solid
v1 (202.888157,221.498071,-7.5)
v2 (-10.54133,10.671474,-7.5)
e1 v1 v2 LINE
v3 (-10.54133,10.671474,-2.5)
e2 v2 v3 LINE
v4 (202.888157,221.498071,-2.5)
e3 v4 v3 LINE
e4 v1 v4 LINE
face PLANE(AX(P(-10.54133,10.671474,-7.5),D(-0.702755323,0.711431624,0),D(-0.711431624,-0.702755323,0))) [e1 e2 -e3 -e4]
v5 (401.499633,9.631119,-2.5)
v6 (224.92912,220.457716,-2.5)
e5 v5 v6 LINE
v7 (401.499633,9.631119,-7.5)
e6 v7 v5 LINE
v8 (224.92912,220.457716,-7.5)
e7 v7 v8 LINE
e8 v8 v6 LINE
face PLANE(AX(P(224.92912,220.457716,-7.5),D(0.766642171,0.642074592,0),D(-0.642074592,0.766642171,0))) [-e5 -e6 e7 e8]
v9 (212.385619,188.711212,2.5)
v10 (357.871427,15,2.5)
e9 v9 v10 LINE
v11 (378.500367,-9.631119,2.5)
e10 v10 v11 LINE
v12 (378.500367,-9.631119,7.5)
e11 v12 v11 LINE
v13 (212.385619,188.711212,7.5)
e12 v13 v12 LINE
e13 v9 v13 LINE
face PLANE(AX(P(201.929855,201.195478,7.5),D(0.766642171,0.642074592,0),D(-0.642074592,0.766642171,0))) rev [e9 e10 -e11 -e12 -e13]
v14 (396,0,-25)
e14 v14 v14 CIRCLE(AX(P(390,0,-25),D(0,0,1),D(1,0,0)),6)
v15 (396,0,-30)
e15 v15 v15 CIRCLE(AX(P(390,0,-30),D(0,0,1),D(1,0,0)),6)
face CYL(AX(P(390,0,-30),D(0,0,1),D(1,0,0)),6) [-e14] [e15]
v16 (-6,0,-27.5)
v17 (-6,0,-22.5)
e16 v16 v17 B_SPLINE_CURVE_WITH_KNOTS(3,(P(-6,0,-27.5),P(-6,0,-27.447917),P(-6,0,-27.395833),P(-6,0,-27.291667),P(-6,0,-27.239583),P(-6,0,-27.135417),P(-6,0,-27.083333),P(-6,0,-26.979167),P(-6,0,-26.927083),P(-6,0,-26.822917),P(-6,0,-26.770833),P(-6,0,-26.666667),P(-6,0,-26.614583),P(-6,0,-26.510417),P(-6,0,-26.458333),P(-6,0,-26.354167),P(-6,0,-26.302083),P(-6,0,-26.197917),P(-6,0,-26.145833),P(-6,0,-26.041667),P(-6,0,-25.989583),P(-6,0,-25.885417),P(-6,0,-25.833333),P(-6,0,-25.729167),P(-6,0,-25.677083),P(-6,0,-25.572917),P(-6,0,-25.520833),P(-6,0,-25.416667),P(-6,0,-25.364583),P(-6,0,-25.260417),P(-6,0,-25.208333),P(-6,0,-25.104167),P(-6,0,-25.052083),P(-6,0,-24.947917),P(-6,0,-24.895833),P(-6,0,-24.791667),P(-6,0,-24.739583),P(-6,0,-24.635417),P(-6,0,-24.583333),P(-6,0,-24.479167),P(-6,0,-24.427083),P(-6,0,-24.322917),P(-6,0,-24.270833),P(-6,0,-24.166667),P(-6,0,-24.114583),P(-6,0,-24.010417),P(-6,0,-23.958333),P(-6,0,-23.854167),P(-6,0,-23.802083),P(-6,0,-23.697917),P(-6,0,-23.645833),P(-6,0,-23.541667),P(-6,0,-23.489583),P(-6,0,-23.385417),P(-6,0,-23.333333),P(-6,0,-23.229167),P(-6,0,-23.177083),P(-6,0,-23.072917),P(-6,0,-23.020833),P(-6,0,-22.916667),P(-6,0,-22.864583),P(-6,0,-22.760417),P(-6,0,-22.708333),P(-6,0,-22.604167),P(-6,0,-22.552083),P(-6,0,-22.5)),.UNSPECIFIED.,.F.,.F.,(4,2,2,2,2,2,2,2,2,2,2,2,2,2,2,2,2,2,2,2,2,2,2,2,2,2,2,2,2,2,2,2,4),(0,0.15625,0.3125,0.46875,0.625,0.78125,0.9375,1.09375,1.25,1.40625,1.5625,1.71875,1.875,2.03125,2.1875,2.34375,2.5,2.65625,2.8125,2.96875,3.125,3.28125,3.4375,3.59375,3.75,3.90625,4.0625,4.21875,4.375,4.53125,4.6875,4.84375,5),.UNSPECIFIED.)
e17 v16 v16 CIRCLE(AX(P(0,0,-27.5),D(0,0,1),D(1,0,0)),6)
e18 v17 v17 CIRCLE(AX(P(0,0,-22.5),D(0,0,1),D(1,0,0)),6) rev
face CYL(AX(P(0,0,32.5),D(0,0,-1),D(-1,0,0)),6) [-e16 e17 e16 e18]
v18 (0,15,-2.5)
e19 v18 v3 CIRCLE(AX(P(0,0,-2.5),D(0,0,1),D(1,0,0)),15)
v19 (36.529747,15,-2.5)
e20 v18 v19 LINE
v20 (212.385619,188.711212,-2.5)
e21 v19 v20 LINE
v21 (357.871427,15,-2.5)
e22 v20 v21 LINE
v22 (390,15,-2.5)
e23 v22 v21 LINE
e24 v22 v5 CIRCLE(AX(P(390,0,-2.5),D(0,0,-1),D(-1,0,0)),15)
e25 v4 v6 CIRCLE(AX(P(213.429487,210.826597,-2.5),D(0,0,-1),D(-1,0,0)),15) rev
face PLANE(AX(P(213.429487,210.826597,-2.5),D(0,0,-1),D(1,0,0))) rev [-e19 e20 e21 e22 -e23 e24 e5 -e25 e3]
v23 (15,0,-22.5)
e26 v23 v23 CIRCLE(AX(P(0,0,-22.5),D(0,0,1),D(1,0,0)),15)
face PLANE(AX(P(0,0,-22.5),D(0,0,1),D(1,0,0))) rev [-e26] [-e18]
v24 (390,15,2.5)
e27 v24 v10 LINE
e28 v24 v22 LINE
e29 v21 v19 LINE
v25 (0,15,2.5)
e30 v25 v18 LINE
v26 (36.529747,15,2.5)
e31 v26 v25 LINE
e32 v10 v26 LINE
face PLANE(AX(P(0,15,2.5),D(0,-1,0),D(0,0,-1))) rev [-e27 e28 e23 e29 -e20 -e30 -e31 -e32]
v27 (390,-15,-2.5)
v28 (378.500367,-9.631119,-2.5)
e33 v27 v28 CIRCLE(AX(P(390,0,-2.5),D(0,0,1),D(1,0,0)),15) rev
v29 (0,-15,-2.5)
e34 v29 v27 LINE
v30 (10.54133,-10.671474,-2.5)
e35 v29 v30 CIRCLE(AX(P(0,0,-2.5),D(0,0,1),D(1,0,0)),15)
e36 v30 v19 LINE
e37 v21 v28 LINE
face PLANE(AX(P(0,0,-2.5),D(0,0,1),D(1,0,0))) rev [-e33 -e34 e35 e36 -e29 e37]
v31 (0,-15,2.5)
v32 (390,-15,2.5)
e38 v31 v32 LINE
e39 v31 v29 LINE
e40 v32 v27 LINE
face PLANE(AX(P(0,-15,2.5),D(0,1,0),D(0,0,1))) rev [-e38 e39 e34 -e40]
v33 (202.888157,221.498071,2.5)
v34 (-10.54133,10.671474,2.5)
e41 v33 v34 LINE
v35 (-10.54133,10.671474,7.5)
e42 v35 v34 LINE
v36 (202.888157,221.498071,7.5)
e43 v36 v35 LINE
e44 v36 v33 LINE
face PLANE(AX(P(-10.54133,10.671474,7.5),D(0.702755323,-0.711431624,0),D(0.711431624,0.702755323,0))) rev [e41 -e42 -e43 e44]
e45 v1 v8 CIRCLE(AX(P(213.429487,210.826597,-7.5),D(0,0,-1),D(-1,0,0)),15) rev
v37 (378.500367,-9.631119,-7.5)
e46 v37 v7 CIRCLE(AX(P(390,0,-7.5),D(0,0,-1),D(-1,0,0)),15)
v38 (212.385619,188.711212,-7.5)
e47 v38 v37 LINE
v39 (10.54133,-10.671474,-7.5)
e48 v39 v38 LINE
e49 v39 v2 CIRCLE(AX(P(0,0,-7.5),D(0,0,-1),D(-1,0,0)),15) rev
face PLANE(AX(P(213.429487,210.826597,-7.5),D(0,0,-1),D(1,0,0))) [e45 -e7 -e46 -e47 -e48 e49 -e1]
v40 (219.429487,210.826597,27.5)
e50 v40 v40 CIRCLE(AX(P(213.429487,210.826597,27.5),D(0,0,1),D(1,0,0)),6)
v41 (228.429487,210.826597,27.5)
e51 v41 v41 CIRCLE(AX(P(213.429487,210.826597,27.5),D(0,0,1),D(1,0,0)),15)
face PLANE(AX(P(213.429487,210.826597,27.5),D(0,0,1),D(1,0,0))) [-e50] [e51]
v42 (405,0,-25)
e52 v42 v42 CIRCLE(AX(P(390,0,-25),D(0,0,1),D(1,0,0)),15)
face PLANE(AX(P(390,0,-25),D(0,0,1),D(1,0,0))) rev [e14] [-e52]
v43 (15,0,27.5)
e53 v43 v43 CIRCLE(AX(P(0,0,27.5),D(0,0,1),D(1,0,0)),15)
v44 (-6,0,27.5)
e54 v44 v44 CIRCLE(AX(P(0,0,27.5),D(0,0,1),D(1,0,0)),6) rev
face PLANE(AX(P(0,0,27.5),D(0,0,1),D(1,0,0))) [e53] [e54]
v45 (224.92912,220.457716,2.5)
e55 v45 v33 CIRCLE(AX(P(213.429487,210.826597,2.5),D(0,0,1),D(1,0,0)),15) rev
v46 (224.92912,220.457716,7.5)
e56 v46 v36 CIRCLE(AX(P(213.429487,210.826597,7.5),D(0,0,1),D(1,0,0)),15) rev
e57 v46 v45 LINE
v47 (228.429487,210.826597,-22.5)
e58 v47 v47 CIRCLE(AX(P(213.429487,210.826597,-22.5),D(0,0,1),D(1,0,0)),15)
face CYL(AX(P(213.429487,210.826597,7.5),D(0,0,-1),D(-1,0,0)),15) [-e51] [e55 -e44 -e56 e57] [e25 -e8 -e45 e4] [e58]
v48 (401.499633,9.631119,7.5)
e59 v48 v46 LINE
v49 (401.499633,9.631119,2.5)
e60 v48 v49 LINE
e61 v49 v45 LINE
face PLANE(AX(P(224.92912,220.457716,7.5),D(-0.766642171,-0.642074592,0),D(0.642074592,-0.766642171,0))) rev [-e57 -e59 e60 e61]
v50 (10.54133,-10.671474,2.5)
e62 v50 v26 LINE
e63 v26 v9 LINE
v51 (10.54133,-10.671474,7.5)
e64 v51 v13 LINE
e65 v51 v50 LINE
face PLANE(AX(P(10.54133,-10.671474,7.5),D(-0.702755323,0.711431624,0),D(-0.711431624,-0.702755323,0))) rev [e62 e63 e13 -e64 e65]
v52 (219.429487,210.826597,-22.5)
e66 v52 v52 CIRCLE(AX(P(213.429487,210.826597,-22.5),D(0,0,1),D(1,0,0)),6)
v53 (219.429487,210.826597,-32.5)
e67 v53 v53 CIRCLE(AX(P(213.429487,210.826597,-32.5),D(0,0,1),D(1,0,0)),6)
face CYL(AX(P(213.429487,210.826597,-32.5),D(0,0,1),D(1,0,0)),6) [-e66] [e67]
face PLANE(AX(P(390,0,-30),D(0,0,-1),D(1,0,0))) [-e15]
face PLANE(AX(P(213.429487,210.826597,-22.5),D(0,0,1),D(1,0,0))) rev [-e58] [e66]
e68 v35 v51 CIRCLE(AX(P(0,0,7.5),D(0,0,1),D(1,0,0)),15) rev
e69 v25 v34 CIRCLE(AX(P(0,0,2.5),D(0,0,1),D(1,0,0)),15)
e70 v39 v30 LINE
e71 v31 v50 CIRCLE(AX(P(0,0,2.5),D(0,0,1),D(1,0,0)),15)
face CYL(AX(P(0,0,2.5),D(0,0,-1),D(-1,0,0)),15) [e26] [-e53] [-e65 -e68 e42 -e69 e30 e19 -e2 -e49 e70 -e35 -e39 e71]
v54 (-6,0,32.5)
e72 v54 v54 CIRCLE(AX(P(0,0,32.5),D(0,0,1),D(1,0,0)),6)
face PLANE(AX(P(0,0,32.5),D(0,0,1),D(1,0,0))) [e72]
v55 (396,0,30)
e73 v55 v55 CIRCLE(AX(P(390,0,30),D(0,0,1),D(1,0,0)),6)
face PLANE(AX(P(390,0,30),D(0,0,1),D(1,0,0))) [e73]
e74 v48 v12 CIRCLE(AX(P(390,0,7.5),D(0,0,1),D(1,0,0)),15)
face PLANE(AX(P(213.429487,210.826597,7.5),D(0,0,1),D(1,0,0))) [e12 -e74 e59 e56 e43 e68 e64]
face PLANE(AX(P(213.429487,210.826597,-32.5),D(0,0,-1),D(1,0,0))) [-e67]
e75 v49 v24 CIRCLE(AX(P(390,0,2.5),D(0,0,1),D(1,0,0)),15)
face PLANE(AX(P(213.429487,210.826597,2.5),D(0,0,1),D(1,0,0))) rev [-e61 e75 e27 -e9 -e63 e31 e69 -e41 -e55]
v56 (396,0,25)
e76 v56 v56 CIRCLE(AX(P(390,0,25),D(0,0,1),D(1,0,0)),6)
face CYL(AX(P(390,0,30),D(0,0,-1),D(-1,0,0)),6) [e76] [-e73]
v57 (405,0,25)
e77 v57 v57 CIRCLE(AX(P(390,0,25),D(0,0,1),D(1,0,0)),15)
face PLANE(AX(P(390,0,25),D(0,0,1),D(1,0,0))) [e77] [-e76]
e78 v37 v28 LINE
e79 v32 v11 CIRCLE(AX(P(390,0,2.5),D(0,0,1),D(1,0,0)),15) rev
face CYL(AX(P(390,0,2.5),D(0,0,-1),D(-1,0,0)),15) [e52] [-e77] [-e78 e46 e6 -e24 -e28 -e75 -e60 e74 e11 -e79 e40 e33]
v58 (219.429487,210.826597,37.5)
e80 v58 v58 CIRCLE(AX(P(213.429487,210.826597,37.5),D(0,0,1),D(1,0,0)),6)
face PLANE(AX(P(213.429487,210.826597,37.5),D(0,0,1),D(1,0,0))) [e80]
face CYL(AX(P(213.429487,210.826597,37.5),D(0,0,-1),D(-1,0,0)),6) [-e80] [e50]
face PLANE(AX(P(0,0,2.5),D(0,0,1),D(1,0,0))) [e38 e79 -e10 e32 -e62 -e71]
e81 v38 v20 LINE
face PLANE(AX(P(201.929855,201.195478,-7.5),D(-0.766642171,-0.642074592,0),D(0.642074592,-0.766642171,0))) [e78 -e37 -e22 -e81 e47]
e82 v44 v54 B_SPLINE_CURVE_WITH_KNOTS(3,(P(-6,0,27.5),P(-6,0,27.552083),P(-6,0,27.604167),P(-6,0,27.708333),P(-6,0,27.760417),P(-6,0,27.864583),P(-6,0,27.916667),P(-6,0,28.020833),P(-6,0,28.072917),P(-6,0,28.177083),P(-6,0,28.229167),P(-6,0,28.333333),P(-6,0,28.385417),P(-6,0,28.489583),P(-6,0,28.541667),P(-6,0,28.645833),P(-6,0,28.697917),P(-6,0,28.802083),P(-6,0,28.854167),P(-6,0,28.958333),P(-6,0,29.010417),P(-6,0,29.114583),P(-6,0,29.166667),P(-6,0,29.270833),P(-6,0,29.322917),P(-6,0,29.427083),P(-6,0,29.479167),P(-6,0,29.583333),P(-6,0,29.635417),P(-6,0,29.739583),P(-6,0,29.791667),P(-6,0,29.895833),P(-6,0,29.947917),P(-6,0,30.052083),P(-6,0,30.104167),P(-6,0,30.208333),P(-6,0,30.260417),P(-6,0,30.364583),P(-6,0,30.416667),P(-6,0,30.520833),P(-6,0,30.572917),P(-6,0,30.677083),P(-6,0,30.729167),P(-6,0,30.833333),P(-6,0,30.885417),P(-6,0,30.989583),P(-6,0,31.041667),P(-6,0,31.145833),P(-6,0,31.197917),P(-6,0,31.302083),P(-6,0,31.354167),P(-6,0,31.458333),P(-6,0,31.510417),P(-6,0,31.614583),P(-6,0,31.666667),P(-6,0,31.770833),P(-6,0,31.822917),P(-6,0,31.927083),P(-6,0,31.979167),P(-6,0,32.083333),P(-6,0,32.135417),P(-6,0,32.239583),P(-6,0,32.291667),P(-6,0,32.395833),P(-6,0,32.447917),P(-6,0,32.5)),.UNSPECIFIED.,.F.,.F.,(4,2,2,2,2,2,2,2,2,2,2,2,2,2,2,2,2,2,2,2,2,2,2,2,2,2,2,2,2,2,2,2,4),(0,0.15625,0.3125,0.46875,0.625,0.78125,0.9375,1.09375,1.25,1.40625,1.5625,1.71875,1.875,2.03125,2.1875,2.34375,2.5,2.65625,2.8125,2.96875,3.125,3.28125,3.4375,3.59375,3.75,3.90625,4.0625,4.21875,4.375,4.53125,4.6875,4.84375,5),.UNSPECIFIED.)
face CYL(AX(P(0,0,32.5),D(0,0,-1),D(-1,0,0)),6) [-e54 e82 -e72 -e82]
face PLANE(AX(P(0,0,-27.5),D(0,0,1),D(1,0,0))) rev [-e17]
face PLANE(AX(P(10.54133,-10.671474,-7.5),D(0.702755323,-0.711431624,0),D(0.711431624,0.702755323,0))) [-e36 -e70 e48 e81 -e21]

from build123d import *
from build123d.topology import SkipClean

# Parameters (mm, degrees)
EXTRUDE_1_DEPTH = 2.5
SKETCH_3_R      = 15
EXTRUDE_2_DEPTH = 25
SKETCH_4_R      = 6
EXTRUDE_3_DEPTH = 5
EXTRUDE_START   = 5
EXTRUDE_4_DEPTH = 5
EXTRUDE_5_DEPTH = 5
SKETCH_9_R      = 15
EXTRUDE_8_DEPTH = 25
SKETCH_10_R     = 6
EXTRUDE_9_DEPTH = 30
SKETCH_7_R      = 15
EXTRUDE_6_DEPTH = 25
SKETCH_8_R      = 6
EXTRUDE_7_DEPTH = 10


with BuildPart() as part:
    # 草图1 → 凸台-拉伸1 (new, symmetric)
    with BuildSketch(Plane.XY):
        with BuildLine():
            Line((0, 15), (390, 15))
            ThreePointArc((390, 15), (405, 0), (390, -15))
            Line((390, -15), (0, -15))
            ThreePointArc((0, -15), (-15, 0), (0, 15))
        make_face()
    extrude(amount=EXTRUDE_1_DEPTH, both=True)

    # 草图3 → 凸台-拉伸2 (add, symmetric)
    with SkipClean():  # the faces are left unmerged after this step: merging them gives an invalid solid
        with BuildSketch(Plane.XY):
            with Locations((390, 0)):
                Circle(SKETCH_3_R)
        extrude(amount=EXTRUDE_2_DEPTH, both=True)

    # 草图4 → 凸台-拉伸3 (add)
    with SkipClean():  # the faces are left unmerged after this step: merging them gives an invalid solid
        with BuildSketch(Plane.XY.offset(25)):
            with Locations((390, 0)):
                Circle(SKETCH_4_R)
        extrude_3 = extrude(amount=EXTRUDE_3_DEPTH)

    # 草图5 → 凸台-拉伸4 (add)
    with SkipClean():  # the faces are left unmerged after this step: merging them gives an invalid solid
        with BuildSketch(Plane.XY.offset(2.5).offset(EXTRUDE_START)):
            with BuildLine():
                Line((224.929119743, 220.45771588), (401.499632564, 9.631118881))
                ThreePointArc((401.499632564, 9.631118881), (399.631118881, -11.499632564), (378.500367436, -9.631118881))
                Line((378.500367436, -9.631118881), (201.929854616, 201.195478118))
                ThreePointArc((201.929854616, 201.195478118), (203.798368298, 222.326229563), (224.929119743, 220.45771588))
            make_face()
        extrude_4 = extrude(amount=-EXTRUDE_4_DEPTH)
    add(part.part.scale(1), mode=Mode.REPLACE)  # the faces are merged on a copy

    # 草图6 → 凸台-拉伸5 (add)
    with SkipClean():  # the faces are left unmerged after this step: merging them gives an invalid solid
        with BuildSketch(Plane.XY.offset(2.5).offset(EXTRUDE_START)):
            with BuildLine():
                Line((-10.54132985, 10.671474359), (202.88815733, 221.498071358))
                ThreePointArc((202.88815733, 221.498071358), (224.100961538, 221.367926849), (223.970817029, 200.15512264))
                Line((223.970817029, 200.15512264), (10.54132985, -10.671474359))
                ThreePointArc((10.54132985, -10.671474359), (-10.671474359, -10.54132985), (-10.54132985, 10.671474359))
            make_face()
        extrude_5 = extrude(amount=-EXTRUDE_5_DEPTH)

    # 镜向1: 凸台-拉伸3, 凸台-拉伸4, 凸台-拉伸5 across plane
    with SkipClean():  # the faces are left unmerged after this step: merging them gives an invalid solid
        add(extrude_3.mirror(Plane.XY))
        add(extrude_4.mirror(Plane.XY))
        add(extrude_5.mirror(Plane.XY))

    # 草图9 → 凸台-拉伸8 (add, symmetric)
    with SkipClean():  # the faces are left unmerged after this step: merging them gives an invalid solid
        with BuildSketch(Plane.XY.offset(2.5)):
            Circle(SKETCH_9_R)
        extrude(amount=EXTRUDE_8_DEPTH, both=True)
    add(part.part.scale(1), mode=Mode.REPLACE)  # the faces are merged on a copy

    # 草图10 → 凸台-拉伸9 (add, symmetric)
    with BuildSketch(Plane.XY.offset(2.5)):
        Circle(SKETCH_10_R)
    extrude(amount=EXTRUDE_9_DEPTH, both=True)

    # 草图7 → 凸台-拉伸6 (add, symmetric)
    with SkipClean():  # the faces are left unmerged after this step: merging them gives an invalid solid
        with BuildSketch(Plane.XY.offset(2.5)):
            with Locations((213.429487179, 210.826596999)):
                Circle(SKETCH_7_R)
        extrude(amount=EXTRUDE_6_DEPTH, both=True)

    # 草图8 → 凸台-拉伸7 (add)
    with SkipClean():  # the faces are left unmerged after this step: merging them gives an invalid solid
        with BuildSketch(Plane.XY.offset(27.5)):
            with Locations((213.429487179, 210.826596999)):
                Circle(SKETCH_8_R)
        extrude_7 = extrude(amount=EXTRUDE_7_DEPTH)

    # 镜向2: 凸台-拉伸7 across plane
    with SkipClean():  # the faces are left unmerged after this step: merging them gives an invalid solid
        add(extrude_7.mirror(Plane(origin=(213.429487179, 210.826596999, 2.5), x_dir=(1, 0, 0), z_dir=(0, 0, 1))))


solid = part.part
